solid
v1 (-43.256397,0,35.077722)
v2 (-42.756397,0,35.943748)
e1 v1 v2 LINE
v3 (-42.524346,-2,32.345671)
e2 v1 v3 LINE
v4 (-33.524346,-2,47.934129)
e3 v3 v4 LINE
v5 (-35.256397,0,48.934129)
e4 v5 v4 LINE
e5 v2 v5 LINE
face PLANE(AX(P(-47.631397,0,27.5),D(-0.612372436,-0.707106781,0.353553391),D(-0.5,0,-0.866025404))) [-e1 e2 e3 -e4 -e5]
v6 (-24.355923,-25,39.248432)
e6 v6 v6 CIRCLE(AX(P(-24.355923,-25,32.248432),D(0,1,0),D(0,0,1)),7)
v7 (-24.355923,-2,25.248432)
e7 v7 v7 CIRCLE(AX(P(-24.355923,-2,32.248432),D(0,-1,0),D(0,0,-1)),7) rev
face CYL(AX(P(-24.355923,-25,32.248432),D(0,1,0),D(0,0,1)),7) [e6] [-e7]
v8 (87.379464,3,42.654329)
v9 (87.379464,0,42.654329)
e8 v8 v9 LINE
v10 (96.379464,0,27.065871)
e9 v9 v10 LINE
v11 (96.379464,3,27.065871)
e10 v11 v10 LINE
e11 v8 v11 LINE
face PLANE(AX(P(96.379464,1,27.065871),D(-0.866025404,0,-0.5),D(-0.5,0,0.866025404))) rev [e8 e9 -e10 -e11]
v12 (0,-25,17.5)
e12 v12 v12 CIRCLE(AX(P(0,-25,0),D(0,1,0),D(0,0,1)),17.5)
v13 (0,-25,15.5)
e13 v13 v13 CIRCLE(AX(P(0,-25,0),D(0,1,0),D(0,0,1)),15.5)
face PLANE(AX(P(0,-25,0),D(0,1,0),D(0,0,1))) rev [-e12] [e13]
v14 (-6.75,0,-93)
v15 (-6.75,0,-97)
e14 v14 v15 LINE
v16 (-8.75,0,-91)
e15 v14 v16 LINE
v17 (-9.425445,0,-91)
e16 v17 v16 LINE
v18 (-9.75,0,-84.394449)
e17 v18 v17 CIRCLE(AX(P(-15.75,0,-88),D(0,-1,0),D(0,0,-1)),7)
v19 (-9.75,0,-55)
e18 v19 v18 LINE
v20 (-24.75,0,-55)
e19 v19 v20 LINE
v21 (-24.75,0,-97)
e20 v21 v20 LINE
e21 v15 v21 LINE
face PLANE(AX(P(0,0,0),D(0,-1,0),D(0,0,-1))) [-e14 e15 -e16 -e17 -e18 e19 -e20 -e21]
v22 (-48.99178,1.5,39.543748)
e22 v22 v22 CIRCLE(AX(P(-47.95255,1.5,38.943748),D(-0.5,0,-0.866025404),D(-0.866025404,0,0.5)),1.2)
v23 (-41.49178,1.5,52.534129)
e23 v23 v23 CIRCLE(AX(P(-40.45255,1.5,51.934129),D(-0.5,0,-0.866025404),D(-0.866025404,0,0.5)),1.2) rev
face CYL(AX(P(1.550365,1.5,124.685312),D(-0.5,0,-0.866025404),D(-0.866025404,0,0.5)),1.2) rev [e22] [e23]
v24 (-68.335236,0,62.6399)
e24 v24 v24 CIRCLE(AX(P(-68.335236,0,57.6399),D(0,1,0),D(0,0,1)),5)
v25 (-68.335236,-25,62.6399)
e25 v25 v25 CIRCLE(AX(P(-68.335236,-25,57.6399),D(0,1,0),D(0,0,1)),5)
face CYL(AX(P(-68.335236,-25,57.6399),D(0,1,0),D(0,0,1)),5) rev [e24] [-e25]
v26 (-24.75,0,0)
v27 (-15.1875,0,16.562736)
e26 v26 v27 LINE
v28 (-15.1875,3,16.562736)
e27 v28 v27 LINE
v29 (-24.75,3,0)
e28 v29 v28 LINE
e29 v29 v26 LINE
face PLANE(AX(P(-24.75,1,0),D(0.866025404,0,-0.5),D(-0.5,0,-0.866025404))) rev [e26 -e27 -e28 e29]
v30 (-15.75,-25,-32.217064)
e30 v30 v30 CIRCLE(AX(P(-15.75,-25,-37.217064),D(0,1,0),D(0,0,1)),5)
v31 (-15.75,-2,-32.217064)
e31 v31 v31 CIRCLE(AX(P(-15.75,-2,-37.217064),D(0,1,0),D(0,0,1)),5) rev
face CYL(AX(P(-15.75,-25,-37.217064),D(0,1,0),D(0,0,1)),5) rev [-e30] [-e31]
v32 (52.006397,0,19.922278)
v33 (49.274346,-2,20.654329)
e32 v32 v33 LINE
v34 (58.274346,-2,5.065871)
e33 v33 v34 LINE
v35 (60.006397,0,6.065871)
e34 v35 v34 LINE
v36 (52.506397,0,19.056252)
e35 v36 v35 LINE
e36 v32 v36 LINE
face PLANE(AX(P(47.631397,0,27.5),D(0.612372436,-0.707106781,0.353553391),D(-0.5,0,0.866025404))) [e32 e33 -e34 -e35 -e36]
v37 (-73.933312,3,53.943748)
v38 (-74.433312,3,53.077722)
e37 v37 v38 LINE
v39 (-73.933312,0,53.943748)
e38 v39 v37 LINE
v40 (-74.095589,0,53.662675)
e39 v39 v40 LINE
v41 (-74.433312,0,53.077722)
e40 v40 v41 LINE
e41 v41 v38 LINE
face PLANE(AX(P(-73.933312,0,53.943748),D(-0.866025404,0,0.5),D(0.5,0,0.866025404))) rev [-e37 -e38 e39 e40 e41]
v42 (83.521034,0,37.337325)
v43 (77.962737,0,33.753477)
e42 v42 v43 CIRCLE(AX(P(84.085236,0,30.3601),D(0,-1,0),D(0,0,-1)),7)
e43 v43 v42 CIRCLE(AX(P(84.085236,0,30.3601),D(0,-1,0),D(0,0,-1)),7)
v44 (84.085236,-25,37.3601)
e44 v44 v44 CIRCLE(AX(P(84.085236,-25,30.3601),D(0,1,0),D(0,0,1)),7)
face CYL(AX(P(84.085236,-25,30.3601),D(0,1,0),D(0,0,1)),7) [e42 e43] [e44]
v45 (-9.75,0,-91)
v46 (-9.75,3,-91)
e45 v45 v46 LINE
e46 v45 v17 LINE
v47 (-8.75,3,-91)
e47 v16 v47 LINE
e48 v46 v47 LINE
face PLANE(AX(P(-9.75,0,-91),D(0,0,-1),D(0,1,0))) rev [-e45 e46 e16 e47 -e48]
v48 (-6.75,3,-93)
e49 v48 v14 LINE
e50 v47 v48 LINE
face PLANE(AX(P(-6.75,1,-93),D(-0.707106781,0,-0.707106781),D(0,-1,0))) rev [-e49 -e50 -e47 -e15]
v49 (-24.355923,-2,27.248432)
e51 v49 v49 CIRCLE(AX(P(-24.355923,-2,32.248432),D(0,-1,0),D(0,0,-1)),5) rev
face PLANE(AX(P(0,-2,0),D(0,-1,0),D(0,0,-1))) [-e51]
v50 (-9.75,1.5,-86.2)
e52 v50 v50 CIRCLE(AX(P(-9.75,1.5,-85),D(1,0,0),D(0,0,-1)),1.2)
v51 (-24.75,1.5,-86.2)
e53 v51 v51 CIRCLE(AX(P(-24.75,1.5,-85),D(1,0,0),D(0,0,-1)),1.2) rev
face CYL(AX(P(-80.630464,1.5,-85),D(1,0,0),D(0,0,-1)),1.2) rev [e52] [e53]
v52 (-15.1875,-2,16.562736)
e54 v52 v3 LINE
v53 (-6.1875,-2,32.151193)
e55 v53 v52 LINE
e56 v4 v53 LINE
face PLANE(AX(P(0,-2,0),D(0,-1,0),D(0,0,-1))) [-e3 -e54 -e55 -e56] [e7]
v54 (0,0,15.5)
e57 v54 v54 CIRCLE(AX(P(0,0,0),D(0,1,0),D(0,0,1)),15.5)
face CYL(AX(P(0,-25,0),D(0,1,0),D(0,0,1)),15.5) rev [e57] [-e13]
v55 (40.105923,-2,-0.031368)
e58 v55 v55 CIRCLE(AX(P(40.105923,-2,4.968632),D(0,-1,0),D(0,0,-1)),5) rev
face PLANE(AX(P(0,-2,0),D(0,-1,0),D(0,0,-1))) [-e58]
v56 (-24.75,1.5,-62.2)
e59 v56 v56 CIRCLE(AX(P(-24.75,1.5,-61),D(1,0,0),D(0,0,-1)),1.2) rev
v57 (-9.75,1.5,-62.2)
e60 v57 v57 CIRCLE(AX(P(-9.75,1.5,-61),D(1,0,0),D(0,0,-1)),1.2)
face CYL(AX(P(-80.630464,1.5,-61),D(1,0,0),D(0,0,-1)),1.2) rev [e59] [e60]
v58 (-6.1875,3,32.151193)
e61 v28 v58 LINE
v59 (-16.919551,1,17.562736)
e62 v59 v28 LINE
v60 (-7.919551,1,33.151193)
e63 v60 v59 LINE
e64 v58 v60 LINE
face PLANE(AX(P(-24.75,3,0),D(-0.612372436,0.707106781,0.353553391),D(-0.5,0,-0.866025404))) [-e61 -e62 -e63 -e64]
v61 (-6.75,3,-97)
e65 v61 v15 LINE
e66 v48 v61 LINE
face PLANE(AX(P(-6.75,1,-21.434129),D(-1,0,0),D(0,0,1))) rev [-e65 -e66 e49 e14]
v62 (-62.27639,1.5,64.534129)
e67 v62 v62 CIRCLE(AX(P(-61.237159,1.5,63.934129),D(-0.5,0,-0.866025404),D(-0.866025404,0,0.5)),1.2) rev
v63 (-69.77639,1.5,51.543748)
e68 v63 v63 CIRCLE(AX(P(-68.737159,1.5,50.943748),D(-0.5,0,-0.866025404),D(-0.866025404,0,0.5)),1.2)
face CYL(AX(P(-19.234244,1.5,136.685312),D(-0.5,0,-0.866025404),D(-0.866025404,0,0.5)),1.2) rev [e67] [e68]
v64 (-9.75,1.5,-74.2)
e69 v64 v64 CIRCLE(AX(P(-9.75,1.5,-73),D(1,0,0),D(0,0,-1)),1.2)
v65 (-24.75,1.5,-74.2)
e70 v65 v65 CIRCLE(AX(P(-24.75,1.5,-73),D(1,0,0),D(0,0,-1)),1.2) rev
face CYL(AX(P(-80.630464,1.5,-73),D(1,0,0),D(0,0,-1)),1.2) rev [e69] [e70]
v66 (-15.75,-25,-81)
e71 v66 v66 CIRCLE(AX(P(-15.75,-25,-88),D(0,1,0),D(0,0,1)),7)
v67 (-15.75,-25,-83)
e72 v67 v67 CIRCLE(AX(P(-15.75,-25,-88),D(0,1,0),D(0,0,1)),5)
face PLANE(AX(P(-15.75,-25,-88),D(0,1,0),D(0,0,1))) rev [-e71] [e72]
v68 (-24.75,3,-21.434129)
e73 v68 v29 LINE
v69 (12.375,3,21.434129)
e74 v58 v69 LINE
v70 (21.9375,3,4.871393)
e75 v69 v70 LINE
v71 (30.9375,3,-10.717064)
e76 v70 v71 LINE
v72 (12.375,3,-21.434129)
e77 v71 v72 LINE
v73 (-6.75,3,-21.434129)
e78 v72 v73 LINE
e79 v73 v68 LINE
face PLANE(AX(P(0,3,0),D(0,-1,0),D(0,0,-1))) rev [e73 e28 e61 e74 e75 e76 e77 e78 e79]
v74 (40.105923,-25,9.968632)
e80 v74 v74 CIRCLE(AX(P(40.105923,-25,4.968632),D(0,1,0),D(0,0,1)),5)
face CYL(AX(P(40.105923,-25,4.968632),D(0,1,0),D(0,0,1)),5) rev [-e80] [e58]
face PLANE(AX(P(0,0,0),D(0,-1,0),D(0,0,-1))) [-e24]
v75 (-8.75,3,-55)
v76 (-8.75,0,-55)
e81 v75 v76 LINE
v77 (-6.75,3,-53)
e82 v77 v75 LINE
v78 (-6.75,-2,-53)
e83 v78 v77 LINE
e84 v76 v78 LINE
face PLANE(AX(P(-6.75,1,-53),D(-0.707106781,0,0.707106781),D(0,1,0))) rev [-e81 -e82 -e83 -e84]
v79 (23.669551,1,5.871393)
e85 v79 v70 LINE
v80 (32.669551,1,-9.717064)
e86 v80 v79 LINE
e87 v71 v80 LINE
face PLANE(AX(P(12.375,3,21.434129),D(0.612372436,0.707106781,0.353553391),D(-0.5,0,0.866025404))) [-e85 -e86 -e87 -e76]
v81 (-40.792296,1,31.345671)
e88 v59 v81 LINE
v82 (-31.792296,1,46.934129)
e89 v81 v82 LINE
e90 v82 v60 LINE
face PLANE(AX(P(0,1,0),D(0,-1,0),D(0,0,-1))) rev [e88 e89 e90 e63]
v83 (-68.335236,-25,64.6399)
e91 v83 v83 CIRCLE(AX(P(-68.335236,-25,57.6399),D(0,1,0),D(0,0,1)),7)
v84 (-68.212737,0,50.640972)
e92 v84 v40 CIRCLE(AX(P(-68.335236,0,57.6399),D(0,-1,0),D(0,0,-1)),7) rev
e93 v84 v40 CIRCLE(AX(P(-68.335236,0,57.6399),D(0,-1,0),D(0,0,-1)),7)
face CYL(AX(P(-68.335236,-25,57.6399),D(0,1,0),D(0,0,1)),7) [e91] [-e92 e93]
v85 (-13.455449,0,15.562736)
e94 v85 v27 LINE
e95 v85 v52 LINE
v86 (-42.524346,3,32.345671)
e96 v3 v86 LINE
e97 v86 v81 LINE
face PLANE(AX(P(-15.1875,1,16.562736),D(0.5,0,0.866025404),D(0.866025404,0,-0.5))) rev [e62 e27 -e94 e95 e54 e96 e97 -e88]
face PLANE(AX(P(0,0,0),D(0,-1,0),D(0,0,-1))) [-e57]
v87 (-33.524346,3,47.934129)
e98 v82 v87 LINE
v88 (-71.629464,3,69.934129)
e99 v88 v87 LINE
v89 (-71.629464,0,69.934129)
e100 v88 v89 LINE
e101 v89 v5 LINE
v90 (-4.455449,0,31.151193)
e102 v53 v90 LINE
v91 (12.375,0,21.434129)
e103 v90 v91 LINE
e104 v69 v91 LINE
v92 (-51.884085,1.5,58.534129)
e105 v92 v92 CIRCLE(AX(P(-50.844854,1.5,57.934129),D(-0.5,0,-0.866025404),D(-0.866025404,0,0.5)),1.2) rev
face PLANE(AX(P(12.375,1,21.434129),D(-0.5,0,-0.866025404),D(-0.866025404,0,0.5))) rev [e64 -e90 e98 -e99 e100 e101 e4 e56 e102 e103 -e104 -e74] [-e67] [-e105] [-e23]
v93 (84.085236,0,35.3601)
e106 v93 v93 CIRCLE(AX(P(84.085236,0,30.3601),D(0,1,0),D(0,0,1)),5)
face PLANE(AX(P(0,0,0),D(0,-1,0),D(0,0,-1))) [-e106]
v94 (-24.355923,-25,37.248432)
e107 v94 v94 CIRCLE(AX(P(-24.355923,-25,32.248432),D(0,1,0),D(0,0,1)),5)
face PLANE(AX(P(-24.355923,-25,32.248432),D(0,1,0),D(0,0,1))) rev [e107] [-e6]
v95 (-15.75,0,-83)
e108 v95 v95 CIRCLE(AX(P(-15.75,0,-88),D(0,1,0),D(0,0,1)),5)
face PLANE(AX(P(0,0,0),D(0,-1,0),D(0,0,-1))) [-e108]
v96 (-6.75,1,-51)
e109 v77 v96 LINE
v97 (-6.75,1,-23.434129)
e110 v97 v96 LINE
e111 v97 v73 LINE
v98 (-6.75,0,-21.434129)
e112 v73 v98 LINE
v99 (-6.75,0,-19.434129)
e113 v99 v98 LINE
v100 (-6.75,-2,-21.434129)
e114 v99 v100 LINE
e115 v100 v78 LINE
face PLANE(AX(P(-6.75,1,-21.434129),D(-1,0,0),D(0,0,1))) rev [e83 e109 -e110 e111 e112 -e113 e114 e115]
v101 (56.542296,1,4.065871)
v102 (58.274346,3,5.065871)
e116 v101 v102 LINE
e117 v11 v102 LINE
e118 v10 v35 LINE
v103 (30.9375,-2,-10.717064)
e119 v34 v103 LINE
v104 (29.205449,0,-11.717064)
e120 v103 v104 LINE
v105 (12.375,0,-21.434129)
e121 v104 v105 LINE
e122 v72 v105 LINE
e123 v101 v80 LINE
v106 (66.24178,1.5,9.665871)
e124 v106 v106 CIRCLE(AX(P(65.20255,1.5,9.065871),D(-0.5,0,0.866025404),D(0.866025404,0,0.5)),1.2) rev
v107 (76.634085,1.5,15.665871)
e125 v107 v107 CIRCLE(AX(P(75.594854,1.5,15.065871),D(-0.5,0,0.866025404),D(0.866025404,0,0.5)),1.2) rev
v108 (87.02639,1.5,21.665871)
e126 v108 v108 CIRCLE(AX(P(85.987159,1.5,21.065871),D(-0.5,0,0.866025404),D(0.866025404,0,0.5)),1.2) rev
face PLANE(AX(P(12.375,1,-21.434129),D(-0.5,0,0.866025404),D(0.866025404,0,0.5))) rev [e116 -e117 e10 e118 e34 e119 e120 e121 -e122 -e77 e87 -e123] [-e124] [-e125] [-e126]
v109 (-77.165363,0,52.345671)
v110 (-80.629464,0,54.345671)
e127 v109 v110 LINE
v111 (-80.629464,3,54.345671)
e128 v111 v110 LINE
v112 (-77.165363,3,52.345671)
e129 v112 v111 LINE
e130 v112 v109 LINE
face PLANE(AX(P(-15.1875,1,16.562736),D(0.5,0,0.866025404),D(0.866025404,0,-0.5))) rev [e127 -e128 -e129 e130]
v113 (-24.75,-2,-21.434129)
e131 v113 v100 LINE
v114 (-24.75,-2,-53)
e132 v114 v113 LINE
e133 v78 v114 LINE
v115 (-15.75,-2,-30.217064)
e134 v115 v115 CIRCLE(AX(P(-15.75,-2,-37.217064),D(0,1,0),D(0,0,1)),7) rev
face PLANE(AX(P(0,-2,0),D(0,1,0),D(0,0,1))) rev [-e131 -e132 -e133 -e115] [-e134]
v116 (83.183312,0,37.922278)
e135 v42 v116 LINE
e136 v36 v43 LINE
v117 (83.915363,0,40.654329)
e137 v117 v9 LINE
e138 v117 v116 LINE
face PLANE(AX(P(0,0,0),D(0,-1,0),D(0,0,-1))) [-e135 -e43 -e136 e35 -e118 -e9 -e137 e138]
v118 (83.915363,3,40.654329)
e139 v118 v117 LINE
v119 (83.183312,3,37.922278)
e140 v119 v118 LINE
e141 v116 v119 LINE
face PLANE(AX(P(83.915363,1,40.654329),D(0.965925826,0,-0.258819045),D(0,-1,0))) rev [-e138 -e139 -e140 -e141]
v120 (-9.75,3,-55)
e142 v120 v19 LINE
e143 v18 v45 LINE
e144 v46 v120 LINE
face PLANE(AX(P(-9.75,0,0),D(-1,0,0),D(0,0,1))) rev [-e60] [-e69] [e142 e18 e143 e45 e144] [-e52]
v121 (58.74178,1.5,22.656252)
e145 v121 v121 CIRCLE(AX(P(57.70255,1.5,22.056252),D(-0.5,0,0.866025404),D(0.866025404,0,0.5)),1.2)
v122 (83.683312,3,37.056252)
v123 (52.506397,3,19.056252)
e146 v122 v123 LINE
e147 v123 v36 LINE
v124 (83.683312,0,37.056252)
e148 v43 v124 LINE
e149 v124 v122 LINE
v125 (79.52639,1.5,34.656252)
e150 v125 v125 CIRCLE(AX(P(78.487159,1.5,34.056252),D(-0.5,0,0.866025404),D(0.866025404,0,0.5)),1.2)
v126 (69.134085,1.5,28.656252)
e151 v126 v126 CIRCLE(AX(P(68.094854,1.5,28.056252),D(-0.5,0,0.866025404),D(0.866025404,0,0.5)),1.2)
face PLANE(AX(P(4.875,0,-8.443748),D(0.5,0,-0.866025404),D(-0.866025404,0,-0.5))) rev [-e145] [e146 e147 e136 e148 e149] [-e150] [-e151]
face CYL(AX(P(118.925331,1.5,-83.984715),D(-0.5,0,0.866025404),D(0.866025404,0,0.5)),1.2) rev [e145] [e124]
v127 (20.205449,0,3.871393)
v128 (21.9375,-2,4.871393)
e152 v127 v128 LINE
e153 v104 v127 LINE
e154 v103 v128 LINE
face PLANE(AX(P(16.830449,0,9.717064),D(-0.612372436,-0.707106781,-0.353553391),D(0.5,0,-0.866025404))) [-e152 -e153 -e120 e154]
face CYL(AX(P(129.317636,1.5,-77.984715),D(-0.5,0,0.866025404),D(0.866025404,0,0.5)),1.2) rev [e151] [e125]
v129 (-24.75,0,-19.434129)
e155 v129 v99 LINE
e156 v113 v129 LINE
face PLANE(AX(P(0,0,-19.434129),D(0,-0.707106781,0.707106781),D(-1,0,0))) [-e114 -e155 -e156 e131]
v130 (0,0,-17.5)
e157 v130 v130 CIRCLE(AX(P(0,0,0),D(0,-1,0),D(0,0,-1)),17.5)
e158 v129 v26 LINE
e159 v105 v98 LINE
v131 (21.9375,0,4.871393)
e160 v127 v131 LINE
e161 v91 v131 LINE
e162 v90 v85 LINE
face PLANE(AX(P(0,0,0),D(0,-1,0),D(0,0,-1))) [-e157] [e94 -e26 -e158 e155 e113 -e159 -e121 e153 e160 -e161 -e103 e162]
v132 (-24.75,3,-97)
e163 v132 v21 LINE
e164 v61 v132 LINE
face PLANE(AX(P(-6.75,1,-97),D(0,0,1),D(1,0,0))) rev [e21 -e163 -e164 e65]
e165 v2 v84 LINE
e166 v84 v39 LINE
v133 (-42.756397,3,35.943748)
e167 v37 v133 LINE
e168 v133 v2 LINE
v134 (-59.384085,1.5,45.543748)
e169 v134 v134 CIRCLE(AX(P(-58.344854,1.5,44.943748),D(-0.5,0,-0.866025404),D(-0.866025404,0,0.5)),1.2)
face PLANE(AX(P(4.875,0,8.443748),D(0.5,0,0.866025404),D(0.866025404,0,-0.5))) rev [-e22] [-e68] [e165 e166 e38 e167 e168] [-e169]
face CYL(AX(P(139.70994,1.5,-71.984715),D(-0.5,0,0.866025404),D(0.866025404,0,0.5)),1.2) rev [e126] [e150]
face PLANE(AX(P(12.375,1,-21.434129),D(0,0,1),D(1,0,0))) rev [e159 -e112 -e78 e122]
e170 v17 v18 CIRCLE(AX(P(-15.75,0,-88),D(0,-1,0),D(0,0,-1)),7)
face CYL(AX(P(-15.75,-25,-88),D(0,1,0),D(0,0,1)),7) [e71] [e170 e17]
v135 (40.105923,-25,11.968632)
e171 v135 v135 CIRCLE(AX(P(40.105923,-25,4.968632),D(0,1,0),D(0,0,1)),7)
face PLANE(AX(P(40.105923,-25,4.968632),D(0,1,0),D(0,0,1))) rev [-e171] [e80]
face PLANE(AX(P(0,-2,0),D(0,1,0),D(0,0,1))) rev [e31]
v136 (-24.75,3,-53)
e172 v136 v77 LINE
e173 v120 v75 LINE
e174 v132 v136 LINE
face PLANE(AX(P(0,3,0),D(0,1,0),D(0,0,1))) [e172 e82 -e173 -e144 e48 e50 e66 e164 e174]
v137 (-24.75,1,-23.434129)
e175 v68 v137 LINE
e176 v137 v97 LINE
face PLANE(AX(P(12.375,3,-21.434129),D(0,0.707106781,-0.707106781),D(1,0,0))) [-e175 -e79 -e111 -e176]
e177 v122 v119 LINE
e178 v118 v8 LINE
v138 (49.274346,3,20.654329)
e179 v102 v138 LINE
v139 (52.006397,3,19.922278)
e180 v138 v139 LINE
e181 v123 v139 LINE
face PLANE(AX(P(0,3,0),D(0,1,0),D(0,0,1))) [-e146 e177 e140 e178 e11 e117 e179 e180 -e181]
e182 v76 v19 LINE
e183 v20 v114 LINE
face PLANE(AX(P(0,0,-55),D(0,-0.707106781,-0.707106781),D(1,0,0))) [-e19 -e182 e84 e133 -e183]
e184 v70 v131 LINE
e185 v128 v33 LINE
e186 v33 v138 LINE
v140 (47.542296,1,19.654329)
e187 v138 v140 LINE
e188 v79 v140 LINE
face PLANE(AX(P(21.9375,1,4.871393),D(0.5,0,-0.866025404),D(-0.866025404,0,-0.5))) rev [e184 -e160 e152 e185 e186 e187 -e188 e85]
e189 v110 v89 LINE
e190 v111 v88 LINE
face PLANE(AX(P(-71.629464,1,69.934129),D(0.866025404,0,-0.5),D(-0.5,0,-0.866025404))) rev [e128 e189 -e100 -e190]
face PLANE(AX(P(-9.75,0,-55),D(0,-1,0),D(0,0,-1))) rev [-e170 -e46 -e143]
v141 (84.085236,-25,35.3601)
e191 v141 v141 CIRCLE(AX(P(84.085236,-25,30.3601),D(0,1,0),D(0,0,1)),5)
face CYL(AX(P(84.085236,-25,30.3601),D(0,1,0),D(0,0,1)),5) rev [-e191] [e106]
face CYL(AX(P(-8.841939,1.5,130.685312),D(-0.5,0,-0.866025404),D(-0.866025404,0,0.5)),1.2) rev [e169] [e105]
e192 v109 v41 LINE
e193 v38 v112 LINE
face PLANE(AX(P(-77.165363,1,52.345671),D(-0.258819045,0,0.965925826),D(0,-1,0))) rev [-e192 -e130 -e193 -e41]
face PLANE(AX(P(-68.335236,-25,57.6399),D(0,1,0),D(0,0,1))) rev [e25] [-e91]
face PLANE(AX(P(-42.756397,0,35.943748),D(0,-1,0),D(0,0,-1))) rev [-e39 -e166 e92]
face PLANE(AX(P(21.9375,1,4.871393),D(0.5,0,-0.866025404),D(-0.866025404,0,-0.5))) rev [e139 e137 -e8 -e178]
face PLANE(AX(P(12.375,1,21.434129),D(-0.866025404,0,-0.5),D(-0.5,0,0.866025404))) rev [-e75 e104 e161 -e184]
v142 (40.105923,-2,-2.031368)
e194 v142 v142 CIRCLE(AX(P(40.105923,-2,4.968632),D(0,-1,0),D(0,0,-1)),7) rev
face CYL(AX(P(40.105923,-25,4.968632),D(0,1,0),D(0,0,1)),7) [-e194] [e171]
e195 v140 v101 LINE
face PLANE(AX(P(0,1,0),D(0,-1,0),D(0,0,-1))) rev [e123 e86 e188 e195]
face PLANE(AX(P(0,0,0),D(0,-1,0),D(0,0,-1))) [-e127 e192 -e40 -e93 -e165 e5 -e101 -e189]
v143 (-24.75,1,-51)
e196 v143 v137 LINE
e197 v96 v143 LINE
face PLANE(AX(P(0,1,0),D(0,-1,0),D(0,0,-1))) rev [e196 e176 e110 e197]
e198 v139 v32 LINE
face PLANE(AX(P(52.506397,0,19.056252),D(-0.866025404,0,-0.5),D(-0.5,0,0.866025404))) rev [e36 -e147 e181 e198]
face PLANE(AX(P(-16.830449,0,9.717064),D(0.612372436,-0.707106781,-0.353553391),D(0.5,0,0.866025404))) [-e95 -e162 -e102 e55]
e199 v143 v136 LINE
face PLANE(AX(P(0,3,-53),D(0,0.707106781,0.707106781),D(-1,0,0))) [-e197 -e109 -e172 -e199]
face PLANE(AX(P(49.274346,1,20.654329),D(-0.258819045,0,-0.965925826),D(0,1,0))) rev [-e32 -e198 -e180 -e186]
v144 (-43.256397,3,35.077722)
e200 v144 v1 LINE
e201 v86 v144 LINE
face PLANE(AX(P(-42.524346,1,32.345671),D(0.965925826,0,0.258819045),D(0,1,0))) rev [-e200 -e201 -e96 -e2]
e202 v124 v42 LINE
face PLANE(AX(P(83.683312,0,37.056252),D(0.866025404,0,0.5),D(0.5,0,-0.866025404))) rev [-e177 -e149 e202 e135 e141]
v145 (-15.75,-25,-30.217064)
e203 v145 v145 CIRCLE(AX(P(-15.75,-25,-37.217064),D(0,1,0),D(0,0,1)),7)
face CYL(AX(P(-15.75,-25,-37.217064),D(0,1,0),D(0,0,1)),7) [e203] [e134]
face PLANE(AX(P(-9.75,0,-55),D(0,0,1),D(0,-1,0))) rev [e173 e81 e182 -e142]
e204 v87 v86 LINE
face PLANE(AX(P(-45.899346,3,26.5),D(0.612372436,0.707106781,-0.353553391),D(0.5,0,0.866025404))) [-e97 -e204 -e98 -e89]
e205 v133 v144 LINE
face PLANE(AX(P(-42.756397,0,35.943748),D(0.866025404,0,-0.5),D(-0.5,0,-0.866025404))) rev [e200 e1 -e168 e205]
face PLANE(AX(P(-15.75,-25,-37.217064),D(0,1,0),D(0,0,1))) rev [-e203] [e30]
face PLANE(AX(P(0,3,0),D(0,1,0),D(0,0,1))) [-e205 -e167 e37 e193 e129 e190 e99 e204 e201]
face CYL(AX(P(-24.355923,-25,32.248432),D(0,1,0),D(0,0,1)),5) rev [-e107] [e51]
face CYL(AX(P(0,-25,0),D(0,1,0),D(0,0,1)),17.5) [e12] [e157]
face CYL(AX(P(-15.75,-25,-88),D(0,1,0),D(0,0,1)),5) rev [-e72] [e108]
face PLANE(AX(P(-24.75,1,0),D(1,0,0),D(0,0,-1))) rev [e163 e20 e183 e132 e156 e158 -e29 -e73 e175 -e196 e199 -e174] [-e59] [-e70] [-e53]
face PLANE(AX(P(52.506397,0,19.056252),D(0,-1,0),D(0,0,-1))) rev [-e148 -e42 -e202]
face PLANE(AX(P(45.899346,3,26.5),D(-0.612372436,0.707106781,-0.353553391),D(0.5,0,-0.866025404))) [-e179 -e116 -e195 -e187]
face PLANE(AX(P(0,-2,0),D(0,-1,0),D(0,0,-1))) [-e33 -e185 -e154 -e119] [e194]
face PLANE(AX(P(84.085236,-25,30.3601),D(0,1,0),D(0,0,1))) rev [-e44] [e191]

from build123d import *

# Parameters (mm, degrees)
SALIENTE_EXTRUIR2_DEPTH = 1
CROQUIS2_R              = 17.500000000000004
CROQUIS2_R_2            = 15.500000000000004
CROQUIS2_R_3            = 7.000000000000005
CROQUIS2_R_4            = 5.000000000000002
CROQUIS2_R_5            = 7.000000000010954
CROQUIS2_R_6            = 5.0000000000000036
CROQUIS2_R_7            = 7.000000000013004
CROQUIS2_R_8            = 5.000000000000005
CROQUIS2_R_9            = 6.999999999999999
CROQUIS2_R_10           = 4.999999999999999
CROQUIS2_R_11           = 7
CROQUIS2_R_12           = 4.999999999999997
CROQUIS2_R_13           = 6.999999999999995
CROQUIS2_R_14           = 5.000000000000001
SALIENTE_EXTRUIR3_DEPTH = 25
SALIENTE_EXTRUIR4_START = 1
SALIENTE_EXTRUIR4_DEPTH = 2
CROQUIS4_W              = 17.999999999999996
CROQUIS4_H              = 31.565871256335136
SALIENTE_EXTRUIR5_DEPTH = 2
CHAFL_N1_SIZE           = 2
CORTAR_EXTRUIR3_REACH   = 141.007
CROQUIS11_R             = 1.2000000000000004
CROQUIS11_R_2           = 1.200000000000001
CROQUIS11_5_R           = 1.2000000000000004
CROQUIS11_5_R_2         = 1.200000000000001
CORTAR_EXTRUIR6_DEPTH   = 9.75
MATRIZC5_COUNT          = 3
CHAFL_N4_SIZE           = 2


with BuildPart() as part:
    # Croquis1 → Saliente-Extruir2 (new body)
    with BuildSketch(Plane(origin=(0, 0, 0), x_dir=(1, 0, 0), z_dir=(0, 1, 0))):
        Polygon((-24.75, 0), (-24.75, 97), (-6.750000000000003, 97), (-6.750000000000004, 21.434128743664857), (12.375000000000004, 21.43412874366486), (96.3794641670906, -27.065871256335015), (87.3794641670906, -42.65432852445492), (21.937499999999993, -4.871392896287427), (12.375000000000004, -21.43412874366486), (-71.62946416709052, -69.93412874366491), (-80.62946416709053, -54.345671475545046), (-15.187499999999979, -16.562735847377407), align=None)
    extrude(amount=SALIENTE_EXTRUIR2_DEPTH)

    # Croquis2 → Saliente-Extruir3 (add)
    # profile 1 of 7: a face of its own
    with BuildSketch(Plane(origin=(0, 0, 0), x_dir=(1, 0, 0), z_dir=(0, 1, 0))):
        with Locations(Location((0, 0, 0), (0, 0, 270))):
            Circle(CROQUIS2_R)
        with Locations(Location((0, 0, 0), (0, 0, 270))):
            Circle(CROQUIS2_R_2, mode=Mode.SUBTRACT)
    # profile 2 of 7: a face of its own
    with BuildSketch(Plane(origin=(0, 0, 0), x_dir=(1, 0, 0), z_dir=(0, 1, 0))):
        with Locations(Location((-15.75, 88.00000000000001, 0), (0, 0, 270))):
            Circle(CROQUIS2_R_3)
        with Locations(Location((-15.75, 88.00000000000001, 0), (0, 0, 270))):
            Circle(CROQUIS2_R_4, mode=Mode.SUBTRACT)
    # profile 3 of 7: a face of its own
    with BuildSketch(Plane(origin=(0, 0, 0), x_dir=(1, 0, 0), z_dir=(0, 1, 0))):
        with Locations(Location((84.08523553304072, -30.36009989038661, 0), (0, 0, 270))):
            Circle(CROQUIS2_R_5)
        with Locations(Location((84.08523553304073, -30.360099890386614, 0), (0, 0, 270))):
            Circle(CROQUIS2_R_6, mode=Mode.SUBTRACT)
    # profile 4 of 7: a face of its own
    with BuildSketch(Plane(origin=(0, 0, 0), x_dir=(1, 0, 0), z_dir=(0, 1, 0))):
        with Locations(Location((-68.3352355330182, -57.639900109609464, 0), (0, 0, 270))):
            Circle(CROQUIS2_R_7)
        with Locations(Location((-68.3352355330182, -57.639900109609464, 0), (0, 0, 270))):
            Circle(CROQUIS2_R_8, mode=Mode.SUBTRACT)
    # profile 5 of 7: a face of its own
    with BuildSketch(Plane(origin=(0, 0, 0), x_dir=(1, 0, 0), z_dir=(0, 1, 0))):
        with Locations(Location((-15.749999999999986, 37.217064371832436, 0), (0, 0, 270))):
            Circle(CROQUIS2_R_9)
        with Locations(Location((-15.749999999999986, 37.217064371832436, 0), (0, 0, 270))):
            Circle(CROQUIS2_R_10, mode=Mode.SUBTRACT)
    # profile 6 of 7: a face of its own
    with BuildSketch(Plane(origin=(0, 0, 0), x_dir=(1, 0, 0), z_dir=(0, 1, 0))):
        with Locations(Location((40.105923200287606, -4.968632076311503, 0), (0, 0, 270))):
            Circle(CROQUIS2_R_11)
        with Locations(Location((40.105923200287606, -4.968632076311503, 0), (0, 0, 270))):
            Circle(CROQUIS2_R_12, mode=Mode.SUBTRACT)
    # profile 7 of 7: a face of its own
    with BuildSketch(Plane(origin=(0, 0, 0), x_dir=(1, 0, 0), z_dir=(0, 1, 0))):
        with Locations(Location((-24.35592320028792, -32.24843229552088, 0), (0, 0, 270))):
            Circle(CROQUIS2_R_13)
        with Locations(Location((-24.35592320028792, -32.24843229552088, 0), (0, 0, 270))):
            Circle(CROQUIS2_R_14, mode=Mode.SUBTRACT)
    extrude(amount=-SALIENTE_EXTRUIR3_DEPTH)

    # Croquis3 → Saliente-Extruir4 (add)
    with BuildSketch(Plane(origin=(0, 0, 0), x_dir=(1, 0, 0), z_dir=(0, 1, 0)).offset(SALIENTE_EXTRUIR4_START)):
        Polygon((-24.75, 97), (-6.7500000000000036, 97), (-6.7500000000000036, 53.00000000000001), (-24.749999999999993, 53.00000000000001), align=None)
        Polygon((96.37946416709256, -27.065871256333594), (58.27434640057726, -5.06587125633361), (49.27434640057727, -20.654328524453497), (87.37946416709256, -42.65432852445349), align=None)
        Polygon((-71.62946416708819, -69.93412874366587), (-33.5243464005729, -47.934128743665845), (-42.52434640057291, -32.34567147554596), (-80.6294641670882, -54.34567147554598), align=None)
        Polygon((-6.750000000000004, 21.434128743664857), (-24.75, 21.434128743664868), (-24.75, 0), (-15.187499999999979, -16.562735847377407), (-6.187499999999971, -32.151193115497286), (12.375000000000004, -21.43412874366486), (21.937499999999993, -4.871392896287427), (30.937500000000007, 10.717064371832583), (12.375000000000004, 21.43412874366486), align=None)
    extrude(amount=SALIENTE_EXTRUIR4_DEPTH)

    # Croquis4 → Saliente-Extruir5 (add)
    with BuildSketch(Plane(origin=(0, 0, 0), x_dir=(1, 0, 0), z_dir=(0, 1, 0))):
        Polygon((58.27434640057523, -5.065871256335415), (30.937500000000057, 10.717064371832285), (21.937499999999986, -4.87139289628757), (49.27434640057516, -20.654328524455266), align=None)
        with Locations((-15.750000000000002, 37.21706437183242)):
            Rectangle(CROQUIS4_W, CROQUIS4_H)
        Polygon((-33.52434640057567, -47.93412874366454), (-6.187500000000291, -32.15119311549722), (-15.187500000000146, -16.562735847377255), (-42.52434640057553, -32.34567147554457), align=None)
    extrude(amount=-SALIENTE_EXTRUIR5_DEPTH)

    # Chaflán1
    chafl_n1_edges = [part.edges().sort_by_distance(p)[0] for p in [
        (-38.02434640057291, 1, 40.139900109605904),
        (53.774346400577265, 1, 12.860099890393553),
        (-15.749999999999998, 1, -53.00000000000001),
        (-10.687499999999973, 1, 24.35696448143735),
        (26.4375, 1, -2.92283573777258),
        (-15.75, 1, -21.434128743664868),
        (-15.750000000000004, 0, -21.434128743664857),
        (-15.750000000000002, 0, -52.99999999999999),
        (26.43750000000002, 0, -2.922835737772358),
        (53.7743464005752, 0, 12.86009989039534),
        (-10.687500000000218, 0, 24.356964481437238),
        (-38.0243464005756, 0, 40.139900109604554),
    ]]
    chamfer(chafl_n1_edges, length=CHAFL_N1_SIZE - 0.0001)  # a hair under: the kernel refuses the full size

    # Croquis11 → Cortar-Extruir3 (cut, up to next)
    with BuildSketch(Plane(origin=(0, 0, 0), x_dir=(0, 0, -1), z_dir=(1, 0, 0)), mode=Mode.PRIVATE) as cortar_extruir3_sk1:
        with Locations((61.000000000000014, 1.4999999999999953)):
            Circle(CROQUIS11_R)
    cortar_extruir3_tool1 = extrude(cortar_extruir3_sk1.sketch, amount=-CORTAR_EXTRUIR3_REACH, mode=Mode.PRIVATE) & part.part
    # Croquis11 → Cortar-Extruir3 (cut, up to next)
    with BuildSketch(Plane(origin=(0, 0, 0), x_dir=(0, 0, -1), z_dir=(1, 0, 0)), mode=Mode.PRIVATE) as cortar_extruir3_sk2:
        with Locations((73.00000000000001, 1.4999999999999967)):
            Circle(CROQUIS11_R_2)
    cortar_extruir3_tool2 = extrude(cortar_extruir3_sk2.sketch, amount=-CORTAR_EXTRUIR3_REACH, mode=Mode.PRIVATE) & part.part
    # Croquis11 → Cortar-Extruir3 (cut, up to next)
    with BuildSketch(Plane(origin=(0, 0, 0), x_dir=(0, 0, -1), z_dir=(1, 0, 0)), mode=Mode.PRIVATE) as cortar_extruir3_sk3:
        with Locations((85, 1.4999999999999982)):
            Circle(CROQUIS11_R_2)
    cortar_extruir3_tool3 = extrude(cortar_extruir3_sk3.sketch, amount=-CORTAR_EXTRUIR3_REACH, mode=Mode.PRIVATE) & part.part
    cortar_extruir3_1 = cortar_extruir3_tool1.solids().sort_by_distance((0, 1.5, -61))[0]
    add(cortar_extruir3_1, mode=Mode.SUBTRACT)
    cortar_extruir3_2 = cortar_extruir3_tool2.solids().sort_by_distance((0, 1.5, -73))[0]
    add(cortar_extruir3_2, mode=Mode.SUBTRACT)
    cortar_extruir3_3 = cortar_extruir3_tool3.solids().sort_by_distance((0, 1.5, -85))[0]
    add(cortar_extruir3_3, mode=Mode.SUBTRACT)
    cortar_extruir3 = cortar_extruir3_1 + cortar_extruir3_2 + cortar_extruir3_3  # Cortar-Extruir3 as one shape, for the pattern or mirror that repeats it

    # Croquis11<5> → Cortar-Extruir6 (cut)
    with BuildSketch(Plane(origin=(0, 0, 0), x_dir=(0, 0, -1), z_dir=(1, 0, 0))):
        Polygon((54.99999999999999, -3.8e-16), (91.00000000000003, -3.8e-16), (91.00000000000009, 3), (55.00000000000002, 2.9999999999999893), align=None)
        with Locations((61.000000000000014, 1.4999999999999953)):
            Circle(CROQUIS11_5_R, mode=Mode.SUBTRACT)
        with Locations((73.00000000000001, 1.4999999999999967)):
            Circle(CROQUIS11_5_R_2, mode=Mode.SUBTRACT)
        with Locations((85, 1.4999999999999982)):
            Circle(CROQUIS11_5_R_2, mode=Mode.SUBTRACT)
    cortar_extruir6 = extrude(amount=-CORTAR_EXTRUIR6_DEPTH, mode=Mode.SUBTRACT)

    # MatrizC5: Cortar-Extruir3, Cortar-Extruir6 ×3 about axis
    matrizc5_axis = Axis((-4.81e-15, 0, 2.27e-15), (0, 1, 0))
    add([cortar_extruir3.rotate(matrizc5_axis, i * 360 / MATRIZC5_COUNT) for i in range(1, MATRIZC5_COUNT)], mode=Mode.SUBTRACT)
    add([cortar_extruir6.rotate(matrizc5_axis, i * 360 / MATRIZC5_COUNT) for i in range(1, MATRIZC5_COUNT)], mode=Mode.SUBTRACT)

    # Chaflán4
    chafl_n4_edges = [part.edges().sort_by_distance(p)[0] for p in [
        (-6.7500000000000036, 1.4999999999999996, -91.00000000000006),
        (-6.7500000000000036, 1.4999999999999944, -55.00000000000001),
        (-75.43331174438393, 1.4999999999999996, 51.34567147554506),
        (-44.25639720814411, 1.4999999999999944, 33.34567147554502),
        (82.18331174438404, 1.4999999999999996, 39.65432852445497),
        (51.00639720814418, 1.4999999999999944, 21.654328524454982),
    ]]
    chamfer(chafl_n4_edges, length=CHAFL_N4_SIZE)


solid = part.part
